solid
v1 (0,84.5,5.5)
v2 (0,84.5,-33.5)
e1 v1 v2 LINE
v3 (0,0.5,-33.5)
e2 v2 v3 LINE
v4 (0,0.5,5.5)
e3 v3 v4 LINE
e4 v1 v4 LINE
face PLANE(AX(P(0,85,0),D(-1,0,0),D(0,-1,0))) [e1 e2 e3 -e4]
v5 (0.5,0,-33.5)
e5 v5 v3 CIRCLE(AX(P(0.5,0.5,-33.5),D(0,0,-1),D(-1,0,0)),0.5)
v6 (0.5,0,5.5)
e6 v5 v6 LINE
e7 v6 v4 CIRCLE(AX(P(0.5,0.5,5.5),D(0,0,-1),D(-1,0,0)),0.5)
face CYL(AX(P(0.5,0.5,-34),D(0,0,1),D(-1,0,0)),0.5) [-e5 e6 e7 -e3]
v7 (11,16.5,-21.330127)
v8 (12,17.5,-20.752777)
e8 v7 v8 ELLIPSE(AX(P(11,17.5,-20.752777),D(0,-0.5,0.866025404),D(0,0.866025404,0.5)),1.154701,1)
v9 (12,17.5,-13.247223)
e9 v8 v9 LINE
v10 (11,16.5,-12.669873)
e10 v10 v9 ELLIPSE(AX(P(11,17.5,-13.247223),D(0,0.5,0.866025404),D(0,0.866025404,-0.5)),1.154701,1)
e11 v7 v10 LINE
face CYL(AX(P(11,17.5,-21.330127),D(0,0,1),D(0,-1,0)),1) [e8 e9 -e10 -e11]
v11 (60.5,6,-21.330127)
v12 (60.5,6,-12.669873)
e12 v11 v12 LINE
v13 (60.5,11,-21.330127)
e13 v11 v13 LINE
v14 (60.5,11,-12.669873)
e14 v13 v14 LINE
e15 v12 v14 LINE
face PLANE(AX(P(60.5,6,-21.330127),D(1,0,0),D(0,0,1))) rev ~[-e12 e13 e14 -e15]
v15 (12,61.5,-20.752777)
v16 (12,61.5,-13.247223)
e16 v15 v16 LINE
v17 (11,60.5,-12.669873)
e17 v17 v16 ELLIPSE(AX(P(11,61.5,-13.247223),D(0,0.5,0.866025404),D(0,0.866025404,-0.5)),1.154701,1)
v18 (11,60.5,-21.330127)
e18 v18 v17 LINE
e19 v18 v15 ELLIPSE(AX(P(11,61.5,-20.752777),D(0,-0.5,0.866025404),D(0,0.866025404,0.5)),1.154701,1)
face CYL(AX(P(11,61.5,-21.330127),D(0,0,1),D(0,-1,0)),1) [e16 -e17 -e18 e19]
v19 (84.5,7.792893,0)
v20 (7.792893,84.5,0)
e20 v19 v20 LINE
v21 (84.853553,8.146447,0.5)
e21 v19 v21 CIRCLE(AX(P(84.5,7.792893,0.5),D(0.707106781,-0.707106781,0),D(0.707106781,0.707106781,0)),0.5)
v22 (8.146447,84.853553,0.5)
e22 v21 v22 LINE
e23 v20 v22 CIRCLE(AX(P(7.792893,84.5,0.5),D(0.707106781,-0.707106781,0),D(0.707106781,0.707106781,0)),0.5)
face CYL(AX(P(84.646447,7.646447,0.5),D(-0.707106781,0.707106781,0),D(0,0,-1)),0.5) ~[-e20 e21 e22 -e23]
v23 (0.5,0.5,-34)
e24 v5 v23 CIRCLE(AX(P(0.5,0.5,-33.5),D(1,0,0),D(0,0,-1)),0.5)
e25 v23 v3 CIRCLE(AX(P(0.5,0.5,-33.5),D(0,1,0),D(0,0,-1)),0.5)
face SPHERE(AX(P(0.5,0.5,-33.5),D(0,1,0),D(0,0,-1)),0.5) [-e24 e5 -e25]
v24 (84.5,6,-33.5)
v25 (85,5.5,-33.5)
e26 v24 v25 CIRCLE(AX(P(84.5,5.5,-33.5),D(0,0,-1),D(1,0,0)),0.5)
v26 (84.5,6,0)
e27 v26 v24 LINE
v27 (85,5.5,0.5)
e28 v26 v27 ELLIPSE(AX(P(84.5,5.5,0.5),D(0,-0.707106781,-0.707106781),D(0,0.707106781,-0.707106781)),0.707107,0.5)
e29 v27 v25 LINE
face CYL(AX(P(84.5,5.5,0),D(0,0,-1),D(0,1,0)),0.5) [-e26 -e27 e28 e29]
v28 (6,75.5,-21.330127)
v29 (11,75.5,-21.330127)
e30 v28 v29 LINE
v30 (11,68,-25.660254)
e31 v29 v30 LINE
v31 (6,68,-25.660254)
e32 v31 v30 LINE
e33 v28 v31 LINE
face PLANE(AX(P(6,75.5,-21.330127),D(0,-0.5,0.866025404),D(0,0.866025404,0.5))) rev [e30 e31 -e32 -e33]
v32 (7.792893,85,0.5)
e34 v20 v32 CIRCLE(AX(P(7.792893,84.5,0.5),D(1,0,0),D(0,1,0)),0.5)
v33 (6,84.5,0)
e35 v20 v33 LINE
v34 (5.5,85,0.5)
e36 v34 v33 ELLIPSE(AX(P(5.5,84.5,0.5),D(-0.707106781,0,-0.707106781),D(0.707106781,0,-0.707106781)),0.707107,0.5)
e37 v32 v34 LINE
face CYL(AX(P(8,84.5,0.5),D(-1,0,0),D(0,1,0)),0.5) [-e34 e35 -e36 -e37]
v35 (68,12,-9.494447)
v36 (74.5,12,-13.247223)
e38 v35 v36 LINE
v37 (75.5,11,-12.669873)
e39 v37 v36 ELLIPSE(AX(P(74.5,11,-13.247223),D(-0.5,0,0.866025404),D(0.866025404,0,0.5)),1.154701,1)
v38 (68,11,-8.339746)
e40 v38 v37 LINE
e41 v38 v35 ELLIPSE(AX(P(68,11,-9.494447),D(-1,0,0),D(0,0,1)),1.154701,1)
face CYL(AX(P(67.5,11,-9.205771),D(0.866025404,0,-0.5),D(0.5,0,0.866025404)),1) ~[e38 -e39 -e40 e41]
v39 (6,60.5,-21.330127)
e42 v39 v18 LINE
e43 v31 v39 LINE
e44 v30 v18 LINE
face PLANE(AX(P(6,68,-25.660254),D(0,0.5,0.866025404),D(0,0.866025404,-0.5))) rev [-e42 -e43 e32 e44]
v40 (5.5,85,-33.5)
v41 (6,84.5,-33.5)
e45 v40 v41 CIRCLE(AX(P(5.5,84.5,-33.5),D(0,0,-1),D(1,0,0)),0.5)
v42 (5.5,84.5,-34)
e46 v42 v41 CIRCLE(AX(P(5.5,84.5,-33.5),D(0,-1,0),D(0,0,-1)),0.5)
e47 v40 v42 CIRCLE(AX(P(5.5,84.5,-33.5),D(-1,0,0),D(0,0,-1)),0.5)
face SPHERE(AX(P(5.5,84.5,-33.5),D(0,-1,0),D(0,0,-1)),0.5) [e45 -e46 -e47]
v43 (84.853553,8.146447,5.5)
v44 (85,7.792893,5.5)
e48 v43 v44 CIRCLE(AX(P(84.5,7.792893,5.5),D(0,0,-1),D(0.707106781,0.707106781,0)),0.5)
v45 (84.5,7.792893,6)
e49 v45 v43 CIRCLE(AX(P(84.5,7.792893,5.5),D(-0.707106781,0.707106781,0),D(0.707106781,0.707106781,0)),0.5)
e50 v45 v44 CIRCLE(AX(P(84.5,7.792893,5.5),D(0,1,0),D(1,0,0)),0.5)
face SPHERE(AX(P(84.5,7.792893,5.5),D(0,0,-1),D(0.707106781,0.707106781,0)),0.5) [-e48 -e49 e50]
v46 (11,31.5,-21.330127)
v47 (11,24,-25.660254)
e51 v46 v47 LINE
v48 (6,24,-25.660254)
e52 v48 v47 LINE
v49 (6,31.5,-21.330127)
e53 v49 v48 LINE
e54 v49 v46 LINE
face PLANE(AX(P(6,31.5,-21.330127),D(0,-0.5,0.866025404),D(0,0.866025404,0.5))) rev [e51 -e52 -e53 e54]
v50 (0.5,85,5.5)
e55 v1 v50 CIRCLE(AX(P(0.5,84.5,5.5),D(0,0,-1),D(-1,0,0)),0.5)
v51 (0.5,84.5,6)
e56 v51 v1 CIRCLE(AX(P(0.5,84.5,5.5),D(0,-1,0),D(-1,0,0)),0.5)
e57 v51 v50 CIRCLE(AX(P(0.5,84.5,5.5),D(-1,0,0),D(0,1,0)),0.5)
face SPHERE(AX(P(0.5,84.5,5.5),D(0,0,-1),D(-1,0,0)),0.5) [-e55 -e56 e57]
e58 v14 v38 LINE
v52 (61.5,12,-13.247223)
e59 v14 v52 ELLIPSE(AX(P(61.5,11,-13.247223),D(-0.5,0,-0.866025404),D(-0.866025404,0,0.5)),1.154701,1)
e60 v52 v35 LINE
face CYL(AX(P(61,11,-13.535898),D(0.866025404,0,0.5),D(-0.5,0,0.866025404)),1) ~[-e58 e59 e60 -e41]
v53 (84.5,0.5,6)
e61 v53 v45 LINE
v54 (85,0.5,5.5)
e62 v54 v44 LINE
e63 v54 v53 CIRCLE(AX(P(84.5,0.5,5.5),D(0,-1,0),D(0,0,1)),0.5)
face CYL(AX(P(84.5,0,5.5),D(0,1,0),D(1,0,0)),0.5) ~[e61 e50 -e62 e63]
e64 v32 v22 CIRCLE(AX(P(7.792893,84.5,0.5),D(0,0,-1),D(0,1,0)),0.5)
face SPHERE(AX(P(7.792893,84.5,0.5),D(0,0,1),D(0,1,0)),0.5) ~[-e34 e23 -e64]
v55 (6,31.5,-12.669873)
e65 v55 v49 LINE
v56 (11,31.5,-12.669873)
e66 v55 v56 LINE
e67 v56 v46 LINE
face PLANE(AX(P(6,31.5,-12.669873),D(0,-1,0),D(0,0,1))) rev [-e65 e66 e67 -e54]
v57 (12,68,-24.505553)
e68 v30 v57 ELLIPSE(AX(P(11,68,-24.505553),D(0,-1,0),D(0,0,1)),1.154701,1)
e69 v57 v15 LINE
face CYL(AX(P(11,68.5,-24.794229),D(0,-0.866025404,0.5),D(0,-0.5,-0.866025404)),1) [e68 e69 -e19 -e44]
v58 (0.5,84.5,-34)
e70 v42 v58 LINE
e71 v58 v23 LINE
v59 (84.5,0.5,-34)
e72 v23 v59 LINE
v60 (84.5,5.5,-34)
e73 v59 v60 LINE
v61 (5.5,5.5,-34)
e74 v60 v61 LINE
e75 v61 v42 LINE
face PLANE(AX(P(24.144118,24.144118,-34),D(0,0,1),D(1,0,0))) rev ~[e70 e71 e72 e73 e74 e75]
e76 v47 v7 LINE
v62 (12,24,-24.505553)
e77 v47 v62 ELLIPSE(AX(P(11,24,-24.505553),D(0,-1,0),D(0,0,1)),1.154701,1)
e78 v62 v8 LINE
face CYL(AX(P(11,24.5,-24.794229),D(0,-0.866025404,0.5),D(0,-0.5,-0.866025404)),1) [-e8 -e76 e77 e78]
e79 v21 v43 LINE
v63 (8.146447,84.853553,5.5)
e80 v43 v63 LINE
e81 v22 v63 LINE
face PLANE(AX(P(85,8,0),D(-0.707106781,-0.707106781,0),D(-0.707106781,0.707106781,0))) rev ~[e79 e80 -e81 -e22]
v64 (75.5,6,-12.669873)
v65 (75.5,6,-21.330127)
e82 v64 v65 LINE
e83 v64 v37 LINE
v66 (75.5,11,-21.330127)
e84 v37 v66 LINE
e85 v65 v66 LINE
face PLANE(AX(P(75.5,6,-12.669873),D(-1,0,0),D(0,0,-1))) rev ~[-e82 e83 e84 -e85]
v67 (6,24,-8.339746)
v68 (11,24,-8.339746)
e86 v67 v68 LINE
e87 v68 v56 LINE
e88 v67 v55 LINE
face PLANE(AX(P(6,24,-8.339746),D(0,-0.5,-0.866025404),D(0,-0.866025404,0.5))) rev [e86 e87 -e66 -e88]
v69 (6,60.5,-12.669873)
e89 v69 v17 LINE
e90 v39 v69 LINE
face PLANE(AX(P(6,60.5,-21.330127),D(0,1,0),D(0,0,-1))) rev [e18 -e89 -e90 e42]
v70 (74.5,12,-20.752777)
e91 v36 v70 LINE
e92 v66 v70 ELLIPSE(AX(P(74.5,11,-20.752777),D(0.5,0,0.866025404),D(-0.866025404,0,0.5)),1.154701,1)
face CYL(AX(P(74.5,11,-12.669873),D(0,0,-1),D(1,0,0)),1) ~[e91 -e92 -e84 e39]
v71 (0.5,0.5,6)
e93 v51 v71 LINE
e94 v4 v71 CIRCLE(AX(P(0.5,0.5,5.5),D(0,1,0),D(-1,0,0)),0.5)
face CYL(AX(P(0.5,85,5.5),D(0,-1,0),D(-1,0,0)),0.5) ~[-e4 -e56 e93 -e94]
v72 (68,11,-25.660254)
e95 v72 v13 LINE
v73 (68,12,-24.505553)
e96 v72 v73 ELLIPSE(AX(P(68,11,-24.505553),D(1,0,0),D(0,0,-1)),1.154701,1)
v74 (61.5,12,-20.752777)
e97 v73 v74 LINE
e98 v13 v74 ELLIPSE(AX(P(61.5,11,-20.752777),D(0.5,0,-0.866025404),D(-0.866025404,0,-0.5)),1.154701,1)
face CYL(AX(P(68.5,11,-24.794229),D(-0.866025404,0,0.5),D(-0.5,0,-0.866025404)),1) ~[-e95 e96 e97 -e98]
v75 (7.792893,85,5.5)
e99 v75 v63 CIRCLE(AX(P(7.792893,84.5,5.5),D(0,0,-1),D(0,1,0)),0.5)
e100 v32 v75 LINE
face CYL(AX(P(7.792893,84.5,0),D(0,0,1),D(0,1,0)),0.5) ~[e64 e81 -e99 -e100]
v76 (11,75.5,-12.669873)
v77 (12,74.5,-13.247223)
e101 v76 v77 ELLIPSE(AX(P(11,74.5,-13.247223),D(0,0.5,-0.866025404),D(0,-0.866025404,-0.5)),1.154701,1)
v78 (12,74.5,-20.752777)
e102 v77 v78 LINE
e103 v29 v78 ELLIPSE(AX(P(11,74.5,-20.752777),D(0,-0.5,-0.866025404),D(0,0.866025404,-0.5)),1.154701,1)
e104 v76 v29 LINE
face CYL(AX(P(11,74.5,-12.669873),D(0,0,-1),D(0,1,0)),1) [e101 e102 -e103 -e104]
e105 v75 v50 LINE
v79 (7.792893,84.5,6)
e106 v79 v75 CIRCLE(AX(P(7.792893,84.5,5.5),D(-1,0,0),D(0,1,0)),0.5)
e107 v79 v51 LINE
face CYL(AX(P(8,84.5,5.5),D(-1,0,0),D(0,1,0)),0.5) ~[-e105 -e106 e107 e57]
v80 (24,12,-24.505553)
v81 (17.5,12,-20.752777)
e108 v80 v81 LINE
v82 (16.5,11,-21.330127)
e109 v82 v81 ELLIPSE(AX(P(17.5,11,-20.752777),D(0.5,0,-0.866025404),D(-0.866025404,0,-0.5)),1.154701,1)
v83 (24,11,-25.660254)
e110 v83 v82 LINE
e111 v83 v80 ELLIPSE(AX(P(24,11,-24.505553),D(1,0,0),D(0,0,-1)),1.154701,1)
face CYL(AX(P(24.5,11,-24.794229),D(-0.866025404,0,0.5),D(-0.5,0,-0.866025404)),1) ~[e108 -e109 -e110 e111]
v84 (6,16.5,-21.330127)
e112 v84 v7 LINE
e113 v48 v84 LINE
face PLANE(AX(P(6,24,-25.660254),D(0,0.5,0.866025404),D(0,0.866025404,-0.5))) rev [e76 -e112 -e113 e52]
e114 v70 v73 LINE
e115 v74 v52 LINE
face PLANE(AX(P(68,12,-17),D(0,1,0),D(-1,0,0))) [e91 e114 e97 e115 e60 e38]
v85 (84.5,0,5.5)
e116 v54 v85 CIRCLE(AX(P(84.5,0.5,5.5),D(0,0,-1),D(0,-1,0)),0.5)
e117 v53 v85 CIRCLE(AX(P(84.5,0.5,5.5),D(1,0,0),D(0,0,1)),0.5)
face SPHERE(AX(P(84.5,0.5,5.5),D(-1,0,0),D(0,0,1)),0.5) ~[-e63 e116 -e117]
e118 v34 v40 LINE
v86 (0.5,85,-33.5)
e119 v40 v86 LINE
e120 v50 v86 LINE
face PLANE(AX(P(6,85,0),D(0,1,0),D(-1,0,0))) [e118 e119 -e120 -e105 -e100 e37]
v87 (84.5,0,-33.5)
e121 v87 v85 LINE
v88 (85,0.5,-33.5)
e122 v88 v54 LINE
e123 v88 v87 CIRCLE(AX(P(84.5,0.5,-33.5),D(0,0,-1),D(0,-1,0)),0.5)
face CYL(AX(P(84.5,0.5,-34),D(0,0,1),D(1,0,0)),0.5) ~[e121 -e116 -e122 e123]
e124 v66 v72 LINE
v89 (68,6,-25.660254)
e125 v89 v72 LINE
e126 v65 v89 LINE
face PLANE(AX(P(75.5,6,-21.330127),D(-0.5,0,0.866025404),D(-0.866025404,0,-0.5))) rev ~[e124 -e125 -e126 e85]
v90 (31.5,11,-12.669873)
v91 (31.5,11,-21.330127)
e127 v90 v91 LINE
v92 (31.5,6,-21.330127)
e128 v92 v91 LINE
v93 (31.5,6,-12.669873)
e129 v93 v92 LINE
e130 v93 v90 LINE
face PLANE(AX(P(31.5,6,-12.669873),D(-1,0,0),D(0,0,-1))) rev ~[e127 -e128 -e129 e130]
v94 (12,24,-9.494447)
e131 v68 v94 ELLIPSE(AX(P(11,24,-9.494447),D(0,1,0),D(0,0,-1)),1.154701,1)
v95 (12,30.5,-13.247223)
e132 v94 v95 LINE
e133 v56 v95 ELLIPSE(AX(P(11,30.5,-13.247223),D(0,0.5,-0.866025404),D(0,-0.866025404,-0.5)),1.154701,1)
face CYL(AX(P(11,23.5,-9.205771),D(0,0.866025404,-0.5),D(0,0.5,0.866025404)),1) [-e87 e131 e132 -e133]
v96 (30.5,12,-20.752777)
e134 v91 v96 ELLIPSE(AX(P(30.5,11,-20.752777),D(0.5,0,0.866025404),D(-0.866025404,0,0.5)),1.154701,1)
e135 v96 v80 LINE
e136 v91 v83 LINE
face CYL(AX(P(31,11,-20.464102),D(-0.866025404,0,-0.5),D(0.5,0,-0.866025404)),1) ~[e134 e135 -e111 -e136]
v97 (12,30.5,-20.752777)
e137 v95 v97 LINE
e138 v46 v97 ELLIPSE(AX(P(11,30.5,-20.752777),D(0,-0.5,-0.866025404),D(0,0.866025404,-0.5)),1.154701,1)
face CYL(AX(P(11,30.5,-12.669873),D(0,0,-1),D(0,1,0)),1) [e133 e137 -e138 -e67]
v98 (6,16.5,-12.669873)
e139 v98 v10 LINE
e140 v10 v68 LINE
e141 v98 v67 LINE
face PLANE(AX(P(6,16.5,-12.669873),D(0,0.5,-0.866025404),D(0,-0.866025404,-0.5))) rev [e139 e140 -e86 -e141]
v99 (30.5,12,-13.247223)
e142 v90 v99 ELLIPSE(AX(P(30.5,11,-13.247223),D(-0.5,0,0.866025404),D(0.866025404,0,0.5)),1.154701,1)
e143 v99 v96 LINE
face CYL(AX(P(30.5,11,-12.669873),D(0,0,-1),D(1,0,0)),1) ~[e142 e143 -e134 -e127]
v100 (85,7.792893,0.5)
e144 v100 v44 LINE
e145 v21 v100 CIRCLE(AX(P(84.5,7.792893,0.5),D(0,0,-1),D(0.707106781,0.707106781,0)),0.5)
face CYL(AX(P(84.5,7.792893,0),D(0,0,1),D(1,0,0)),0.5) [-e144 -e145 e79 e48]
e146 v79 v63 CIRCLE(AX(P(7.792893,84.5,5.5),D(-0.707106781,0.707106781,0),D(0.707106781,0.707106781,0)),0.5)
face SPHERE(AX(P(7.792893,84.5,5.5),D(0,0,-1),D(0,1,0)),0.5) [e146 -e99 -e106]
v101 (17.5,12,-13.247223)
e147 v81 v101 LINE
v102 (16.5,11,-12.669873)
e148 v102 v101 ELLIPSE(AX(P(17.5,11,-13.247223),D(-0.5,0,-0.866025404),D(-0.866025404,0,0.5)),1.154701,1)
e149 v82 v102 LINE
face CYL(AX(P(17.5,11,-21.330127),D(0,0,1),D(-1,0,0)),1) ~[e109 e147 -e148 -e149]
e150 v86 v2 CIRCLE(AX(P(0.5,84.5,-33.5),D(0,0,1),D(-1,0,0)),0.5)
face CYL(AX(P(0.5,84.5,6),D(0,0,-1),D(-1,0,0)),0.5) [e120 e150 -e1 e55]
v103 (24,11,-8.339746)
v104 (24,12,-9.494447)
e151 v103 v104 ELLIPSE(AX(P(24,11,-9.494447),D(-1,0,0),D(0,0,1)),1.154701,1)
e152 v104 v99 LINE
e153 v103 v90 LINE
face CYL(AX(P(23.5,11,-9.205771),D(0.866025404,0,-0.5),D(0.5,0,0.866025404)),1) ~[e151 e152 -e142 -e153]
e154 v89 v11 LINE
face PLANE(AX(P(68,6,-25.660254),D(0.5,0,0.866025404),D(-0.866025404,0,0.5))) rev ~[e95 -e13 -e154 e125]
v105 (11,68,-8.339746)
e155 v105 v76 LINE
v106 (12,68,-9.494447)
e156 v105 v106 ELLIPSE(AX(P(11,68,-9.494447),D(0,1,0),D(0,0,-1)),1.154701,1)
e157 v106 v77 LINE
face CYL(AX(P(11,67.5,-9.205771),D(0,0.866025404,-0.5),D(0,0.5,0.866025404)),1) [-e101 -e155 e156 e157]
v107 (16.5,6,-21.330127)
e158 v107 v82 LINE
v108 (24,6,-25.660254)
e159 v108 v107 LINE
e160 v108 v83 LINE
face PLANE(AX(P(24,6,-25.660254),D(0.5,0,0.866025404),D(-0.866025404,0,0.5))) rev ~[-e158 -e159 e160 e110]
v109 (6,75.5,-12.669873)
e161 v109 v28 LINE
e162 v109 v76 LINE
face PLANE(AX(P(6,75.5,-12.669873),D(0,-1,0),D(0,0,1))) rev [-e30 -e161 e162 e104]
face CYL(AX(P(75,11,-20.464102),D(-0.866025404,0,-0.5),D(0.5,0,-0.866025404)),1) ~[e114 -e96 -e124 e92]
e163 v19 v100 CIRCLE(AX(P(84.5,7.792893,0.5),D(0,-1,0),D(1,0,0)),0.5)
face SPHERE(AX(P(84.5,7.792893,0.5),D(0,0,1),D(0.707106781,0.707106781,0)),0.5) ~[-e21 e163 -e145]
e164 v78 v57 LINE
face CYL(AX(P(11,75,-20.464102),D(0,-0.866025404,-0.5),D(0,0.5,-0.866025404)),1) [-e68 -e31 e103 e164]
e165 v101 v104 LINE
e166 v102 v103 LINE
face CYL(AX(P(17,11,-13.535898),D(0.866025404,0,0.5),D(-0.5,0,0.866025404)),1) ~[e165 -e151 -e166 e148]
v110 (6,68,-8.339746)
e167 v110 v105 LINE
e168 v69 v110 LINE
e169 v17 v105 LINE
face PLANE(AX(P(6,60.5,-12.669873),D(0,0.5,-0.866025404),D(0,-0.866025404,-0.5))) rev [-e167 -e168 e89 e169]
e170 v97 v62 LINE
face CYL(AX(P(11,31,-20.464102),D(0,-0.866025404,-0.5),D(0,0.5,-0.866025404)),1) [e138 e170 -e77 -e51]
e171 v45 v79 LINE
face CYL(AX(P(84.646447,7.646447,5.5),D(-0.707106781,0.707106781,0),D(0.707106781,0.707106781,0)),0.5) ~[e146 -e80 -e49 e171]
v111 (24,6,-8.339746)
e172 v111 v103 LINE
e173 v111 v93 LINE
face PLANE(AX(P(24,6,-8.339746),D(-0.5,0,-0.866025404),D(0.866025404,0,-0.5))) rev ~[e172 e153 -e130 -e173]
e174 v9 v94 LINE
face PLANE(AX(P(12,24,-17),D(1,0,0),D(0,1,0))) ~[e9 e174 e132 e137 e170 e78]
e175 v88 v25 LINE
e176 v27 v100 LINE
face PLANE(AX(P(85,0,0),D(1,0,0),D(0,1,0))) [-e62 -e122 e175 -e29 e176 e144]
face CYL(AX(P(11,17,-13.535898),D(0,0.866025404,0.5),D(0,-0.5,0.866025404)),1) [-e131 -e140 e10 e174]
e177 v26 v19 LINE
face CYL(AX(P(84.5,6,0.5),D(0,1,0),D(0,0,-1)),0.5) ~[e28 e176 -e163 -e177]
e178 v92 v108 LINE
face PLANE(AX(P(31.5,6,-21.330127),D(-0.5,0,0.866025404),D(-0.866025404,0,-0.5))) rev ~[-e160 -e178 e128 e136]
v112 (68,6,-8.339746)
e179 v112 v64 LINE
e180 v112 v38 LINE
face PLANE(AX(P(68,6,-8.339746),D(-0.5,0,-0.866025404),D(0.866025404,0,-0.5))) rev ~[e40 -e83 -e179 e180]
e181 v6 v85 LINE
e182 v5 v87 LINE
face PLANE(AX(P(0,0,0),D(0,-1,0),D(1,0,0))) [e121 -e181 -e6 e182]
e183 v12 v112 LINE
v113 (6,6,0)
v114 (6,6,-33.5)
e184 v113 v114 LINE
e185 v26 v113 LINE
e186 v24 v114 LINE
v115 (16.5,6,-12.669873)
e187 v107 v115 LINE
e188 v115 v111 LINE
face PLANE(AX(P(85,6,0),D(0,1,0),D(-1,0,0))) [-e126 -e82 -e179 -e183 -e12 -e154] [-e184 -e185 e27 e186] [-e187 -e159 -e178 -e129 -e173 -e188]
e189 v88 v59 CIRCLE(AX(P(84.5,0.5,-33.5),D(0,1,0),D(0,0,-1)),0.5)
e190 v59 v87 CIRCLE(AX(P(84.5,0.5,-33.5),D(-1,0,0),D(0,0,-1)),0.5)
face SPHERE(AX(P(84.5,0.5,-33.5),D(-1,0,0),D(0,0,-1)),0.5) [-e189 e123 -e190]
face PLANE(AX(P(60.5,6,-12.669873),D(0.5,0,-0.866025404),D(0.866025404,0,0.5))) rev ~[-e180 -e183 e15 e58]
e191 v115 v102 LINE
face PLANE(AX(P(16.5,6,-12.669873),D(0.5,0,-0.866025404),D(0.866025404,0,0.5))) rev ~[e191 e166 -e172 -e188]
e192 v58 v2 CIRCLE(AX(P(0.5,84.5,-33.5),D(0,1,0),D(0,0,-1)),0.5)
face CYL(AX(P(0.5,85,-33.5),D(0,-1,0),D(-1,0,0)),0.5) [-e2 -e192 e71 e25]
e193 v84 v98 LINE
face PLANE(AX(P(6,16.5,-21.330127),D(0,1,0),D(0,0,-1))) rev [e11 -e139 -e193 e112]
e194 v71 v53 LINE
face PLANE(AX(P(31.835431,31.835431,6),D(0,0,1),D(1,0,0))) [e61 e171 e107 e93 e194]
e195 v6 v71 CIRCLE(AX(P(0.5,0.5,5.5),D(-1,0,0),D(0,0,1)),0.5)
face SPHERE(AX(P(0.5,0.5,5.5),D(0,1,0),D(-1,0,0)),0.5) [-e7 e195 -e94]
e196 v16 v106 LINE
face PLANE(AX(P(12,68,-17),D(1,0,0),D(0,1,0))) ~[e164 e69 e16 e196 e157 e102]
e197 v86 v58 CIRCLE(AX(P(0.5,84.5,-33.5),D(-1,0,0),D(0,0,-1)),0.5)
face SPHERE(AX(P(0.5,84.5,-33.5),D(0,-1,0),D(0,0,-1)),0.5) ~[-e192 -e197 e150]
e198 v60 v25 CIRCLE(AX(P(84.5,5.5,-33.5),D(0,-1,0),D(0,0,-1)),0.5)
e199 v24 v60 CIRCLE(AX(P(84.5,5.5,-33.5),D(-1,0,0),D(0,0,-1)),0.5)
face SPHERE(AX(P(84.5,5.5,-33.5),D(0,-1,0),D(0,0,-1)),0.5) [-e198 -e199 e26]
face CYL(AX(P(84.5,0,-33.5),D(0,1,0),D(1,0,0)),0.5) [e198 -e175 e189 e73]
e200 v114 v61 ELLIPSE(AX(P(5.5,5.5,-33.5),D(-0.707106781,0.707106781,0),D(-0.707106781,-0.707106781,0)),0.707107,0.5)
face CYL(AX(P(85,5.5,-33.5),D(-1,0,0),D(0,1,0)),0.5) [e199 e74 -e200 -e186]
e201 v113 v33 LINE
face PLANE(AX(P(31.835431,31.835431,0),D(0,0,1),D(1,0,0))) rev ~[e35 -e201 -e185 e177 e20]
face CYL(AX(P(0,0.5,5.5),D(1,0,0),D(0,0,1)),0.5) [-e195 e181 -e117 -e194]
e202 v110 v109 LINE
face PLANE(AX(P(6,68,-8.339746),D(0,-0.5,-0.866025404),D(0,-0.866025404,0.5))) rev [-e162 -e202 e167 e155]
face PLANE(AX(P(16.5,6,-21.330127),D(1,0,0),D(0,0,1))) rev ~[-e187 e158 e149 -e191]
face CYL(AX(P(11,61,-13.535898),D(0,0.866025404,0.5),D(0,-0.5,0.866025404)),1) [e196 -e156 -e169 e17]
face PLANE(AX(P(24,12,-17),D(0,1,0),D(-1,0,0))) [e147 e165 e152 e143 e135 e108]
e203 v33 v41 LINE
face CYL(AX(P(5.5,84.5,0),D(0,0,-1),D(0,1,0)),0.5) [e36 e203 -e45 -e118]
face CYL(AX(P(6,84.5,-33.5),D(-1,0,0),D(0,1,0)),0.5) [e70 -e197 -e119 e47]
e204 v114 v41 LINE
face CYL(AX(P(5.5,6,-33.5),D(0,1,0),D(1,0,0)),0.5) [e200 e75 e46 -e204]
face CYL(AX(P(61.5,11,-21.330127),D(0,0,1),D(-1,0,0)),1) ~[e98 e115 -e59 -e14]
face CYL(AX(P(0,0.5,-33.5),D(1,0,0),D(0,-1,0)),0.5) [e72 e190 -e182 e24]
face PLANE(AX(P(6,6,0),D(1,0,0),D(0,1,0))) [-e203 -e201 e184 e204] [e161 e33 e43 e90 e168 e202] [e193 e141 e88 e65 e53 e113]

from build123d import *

# Parameters (mm, degrees)
F1_DEPTH = 6
F3_DEPTH = 34
F4_R     = 0.5
F7_DEPTH = 6
F8_R     = 1


# Not quite as in the source:
# - a pattern or mirror of a feature is missing from the dataset's text; its kind, count and spacing are read off the source's solid


with BuildPart() as f1:
    # F0 (on Top) → F1 (new body)
    with BuildSketch(Plane.XY):
        Polygon((0, 85), (0, 0), (85, 0), (85, 8), (8, 85), align=None)
    extrude(amount=F1_DEPTH)

    # F2 (on Top) → F3 (join)
    with BuildSketch(Plane.XY):
        Polygon((0, 85), (0, 0), (85, 0), (85, 6), (6, 6), (6, 85), align=None)
    extrude(amount=-F3_DEPTH)

    # F4
    f4_edges = [f1.edges().sort_by_distance(p)[0] for p in [
        (0, 42.5, -34),
        (42.5, 0, -34),
        (85, 3, -34),
        (45.5, 6, -34),
        (6, 45.5, -34),
        (3, 85, -34),
        (0, 85, -14),
        (0, 42.5, 6),
        (0, 0, -14),
        (8, 85, 3),
        (4, 85, 6),
        (6, 85, -17),
        (7, 85, 0),
        (85, 8, 3),
        (46.5, 46.5, 0),
        (46.5, 46.5, 6),
        (42.5, 0, 6),
        (85, 4, 6),
        (85, 0, -14),
        (85, 7, 0),
        (85, 6, -17),
    ]]
    fillet(f4_edges, radius=F4_R)

    # F6 (on face) → F7 (join)
    with BuildSketch(Plane(origin=(0, 6, 0), x_dir=(-1, 0, 0), z_dir=(0, 1, 0))):
        Polygon((-68, -25.6602540378), (-60.5, -21.3301270189), (-60.5, -12.6698729811), (-68, -8.3397459622), (-75.5, -12.6698729811), (-75.5, -21.3301270189), align=None)
        Polygon((-24, -25.6602540378), (-16.5, -21.3301270189), (-16.5, -12.6698729811), (-24, -8.3397459622), (-31.5, -12.6698729811), (-31.5, -21.3301270189), align=None)
    f7 = extrude(amount=F7_DEPTH)

    # F7_copies: F7 across plane
    add(f7.mirror(Plane(origin=(0, 0, 0), x_dir=(0.7071067812, 0.7071067812, 0), z_dir=(-0.7071067812, 0.7071067812, 0))))

    # F8
    f8_edges = [f1.edges().sort_by_distance(p)[0] for p in [
        (71.75, 12, -23.495191),
        (64.25, 12, -23.495191),
        (60.5, 12, -17),
        (64.25, 12, -10.504809),
        (71.75, 12, -10.504809),
        (75.5, 12, -17),
        (27.75, 12, -23.495191),
        (20.25, 12, -23.495191),
        (16.5, 12, -17),
        (20.25, 12, -10.504809),
        (27.75, 12, -10.504809),
        (31.5, 12, -17),
        (12, 31.5, -17),
        (12, 27.75, -10.504809),
        (12, 20.25, -10.504809),
        (12, 16.5, -17),
        (12, 20.25, -23.495191),
        (12, 27.75, -23.495191),
        (12, 75.5, -17),
        (12, 71.75, -10.504809),
        (12, 64.25, -10.504809),
        (12, 60.5, -17),
        (12, 64.25, -23.495191),
        (12, 71.75, -23.495191),
    ]]
    fillet(f8_edges, radius=F8_R)


solid = f1.part
